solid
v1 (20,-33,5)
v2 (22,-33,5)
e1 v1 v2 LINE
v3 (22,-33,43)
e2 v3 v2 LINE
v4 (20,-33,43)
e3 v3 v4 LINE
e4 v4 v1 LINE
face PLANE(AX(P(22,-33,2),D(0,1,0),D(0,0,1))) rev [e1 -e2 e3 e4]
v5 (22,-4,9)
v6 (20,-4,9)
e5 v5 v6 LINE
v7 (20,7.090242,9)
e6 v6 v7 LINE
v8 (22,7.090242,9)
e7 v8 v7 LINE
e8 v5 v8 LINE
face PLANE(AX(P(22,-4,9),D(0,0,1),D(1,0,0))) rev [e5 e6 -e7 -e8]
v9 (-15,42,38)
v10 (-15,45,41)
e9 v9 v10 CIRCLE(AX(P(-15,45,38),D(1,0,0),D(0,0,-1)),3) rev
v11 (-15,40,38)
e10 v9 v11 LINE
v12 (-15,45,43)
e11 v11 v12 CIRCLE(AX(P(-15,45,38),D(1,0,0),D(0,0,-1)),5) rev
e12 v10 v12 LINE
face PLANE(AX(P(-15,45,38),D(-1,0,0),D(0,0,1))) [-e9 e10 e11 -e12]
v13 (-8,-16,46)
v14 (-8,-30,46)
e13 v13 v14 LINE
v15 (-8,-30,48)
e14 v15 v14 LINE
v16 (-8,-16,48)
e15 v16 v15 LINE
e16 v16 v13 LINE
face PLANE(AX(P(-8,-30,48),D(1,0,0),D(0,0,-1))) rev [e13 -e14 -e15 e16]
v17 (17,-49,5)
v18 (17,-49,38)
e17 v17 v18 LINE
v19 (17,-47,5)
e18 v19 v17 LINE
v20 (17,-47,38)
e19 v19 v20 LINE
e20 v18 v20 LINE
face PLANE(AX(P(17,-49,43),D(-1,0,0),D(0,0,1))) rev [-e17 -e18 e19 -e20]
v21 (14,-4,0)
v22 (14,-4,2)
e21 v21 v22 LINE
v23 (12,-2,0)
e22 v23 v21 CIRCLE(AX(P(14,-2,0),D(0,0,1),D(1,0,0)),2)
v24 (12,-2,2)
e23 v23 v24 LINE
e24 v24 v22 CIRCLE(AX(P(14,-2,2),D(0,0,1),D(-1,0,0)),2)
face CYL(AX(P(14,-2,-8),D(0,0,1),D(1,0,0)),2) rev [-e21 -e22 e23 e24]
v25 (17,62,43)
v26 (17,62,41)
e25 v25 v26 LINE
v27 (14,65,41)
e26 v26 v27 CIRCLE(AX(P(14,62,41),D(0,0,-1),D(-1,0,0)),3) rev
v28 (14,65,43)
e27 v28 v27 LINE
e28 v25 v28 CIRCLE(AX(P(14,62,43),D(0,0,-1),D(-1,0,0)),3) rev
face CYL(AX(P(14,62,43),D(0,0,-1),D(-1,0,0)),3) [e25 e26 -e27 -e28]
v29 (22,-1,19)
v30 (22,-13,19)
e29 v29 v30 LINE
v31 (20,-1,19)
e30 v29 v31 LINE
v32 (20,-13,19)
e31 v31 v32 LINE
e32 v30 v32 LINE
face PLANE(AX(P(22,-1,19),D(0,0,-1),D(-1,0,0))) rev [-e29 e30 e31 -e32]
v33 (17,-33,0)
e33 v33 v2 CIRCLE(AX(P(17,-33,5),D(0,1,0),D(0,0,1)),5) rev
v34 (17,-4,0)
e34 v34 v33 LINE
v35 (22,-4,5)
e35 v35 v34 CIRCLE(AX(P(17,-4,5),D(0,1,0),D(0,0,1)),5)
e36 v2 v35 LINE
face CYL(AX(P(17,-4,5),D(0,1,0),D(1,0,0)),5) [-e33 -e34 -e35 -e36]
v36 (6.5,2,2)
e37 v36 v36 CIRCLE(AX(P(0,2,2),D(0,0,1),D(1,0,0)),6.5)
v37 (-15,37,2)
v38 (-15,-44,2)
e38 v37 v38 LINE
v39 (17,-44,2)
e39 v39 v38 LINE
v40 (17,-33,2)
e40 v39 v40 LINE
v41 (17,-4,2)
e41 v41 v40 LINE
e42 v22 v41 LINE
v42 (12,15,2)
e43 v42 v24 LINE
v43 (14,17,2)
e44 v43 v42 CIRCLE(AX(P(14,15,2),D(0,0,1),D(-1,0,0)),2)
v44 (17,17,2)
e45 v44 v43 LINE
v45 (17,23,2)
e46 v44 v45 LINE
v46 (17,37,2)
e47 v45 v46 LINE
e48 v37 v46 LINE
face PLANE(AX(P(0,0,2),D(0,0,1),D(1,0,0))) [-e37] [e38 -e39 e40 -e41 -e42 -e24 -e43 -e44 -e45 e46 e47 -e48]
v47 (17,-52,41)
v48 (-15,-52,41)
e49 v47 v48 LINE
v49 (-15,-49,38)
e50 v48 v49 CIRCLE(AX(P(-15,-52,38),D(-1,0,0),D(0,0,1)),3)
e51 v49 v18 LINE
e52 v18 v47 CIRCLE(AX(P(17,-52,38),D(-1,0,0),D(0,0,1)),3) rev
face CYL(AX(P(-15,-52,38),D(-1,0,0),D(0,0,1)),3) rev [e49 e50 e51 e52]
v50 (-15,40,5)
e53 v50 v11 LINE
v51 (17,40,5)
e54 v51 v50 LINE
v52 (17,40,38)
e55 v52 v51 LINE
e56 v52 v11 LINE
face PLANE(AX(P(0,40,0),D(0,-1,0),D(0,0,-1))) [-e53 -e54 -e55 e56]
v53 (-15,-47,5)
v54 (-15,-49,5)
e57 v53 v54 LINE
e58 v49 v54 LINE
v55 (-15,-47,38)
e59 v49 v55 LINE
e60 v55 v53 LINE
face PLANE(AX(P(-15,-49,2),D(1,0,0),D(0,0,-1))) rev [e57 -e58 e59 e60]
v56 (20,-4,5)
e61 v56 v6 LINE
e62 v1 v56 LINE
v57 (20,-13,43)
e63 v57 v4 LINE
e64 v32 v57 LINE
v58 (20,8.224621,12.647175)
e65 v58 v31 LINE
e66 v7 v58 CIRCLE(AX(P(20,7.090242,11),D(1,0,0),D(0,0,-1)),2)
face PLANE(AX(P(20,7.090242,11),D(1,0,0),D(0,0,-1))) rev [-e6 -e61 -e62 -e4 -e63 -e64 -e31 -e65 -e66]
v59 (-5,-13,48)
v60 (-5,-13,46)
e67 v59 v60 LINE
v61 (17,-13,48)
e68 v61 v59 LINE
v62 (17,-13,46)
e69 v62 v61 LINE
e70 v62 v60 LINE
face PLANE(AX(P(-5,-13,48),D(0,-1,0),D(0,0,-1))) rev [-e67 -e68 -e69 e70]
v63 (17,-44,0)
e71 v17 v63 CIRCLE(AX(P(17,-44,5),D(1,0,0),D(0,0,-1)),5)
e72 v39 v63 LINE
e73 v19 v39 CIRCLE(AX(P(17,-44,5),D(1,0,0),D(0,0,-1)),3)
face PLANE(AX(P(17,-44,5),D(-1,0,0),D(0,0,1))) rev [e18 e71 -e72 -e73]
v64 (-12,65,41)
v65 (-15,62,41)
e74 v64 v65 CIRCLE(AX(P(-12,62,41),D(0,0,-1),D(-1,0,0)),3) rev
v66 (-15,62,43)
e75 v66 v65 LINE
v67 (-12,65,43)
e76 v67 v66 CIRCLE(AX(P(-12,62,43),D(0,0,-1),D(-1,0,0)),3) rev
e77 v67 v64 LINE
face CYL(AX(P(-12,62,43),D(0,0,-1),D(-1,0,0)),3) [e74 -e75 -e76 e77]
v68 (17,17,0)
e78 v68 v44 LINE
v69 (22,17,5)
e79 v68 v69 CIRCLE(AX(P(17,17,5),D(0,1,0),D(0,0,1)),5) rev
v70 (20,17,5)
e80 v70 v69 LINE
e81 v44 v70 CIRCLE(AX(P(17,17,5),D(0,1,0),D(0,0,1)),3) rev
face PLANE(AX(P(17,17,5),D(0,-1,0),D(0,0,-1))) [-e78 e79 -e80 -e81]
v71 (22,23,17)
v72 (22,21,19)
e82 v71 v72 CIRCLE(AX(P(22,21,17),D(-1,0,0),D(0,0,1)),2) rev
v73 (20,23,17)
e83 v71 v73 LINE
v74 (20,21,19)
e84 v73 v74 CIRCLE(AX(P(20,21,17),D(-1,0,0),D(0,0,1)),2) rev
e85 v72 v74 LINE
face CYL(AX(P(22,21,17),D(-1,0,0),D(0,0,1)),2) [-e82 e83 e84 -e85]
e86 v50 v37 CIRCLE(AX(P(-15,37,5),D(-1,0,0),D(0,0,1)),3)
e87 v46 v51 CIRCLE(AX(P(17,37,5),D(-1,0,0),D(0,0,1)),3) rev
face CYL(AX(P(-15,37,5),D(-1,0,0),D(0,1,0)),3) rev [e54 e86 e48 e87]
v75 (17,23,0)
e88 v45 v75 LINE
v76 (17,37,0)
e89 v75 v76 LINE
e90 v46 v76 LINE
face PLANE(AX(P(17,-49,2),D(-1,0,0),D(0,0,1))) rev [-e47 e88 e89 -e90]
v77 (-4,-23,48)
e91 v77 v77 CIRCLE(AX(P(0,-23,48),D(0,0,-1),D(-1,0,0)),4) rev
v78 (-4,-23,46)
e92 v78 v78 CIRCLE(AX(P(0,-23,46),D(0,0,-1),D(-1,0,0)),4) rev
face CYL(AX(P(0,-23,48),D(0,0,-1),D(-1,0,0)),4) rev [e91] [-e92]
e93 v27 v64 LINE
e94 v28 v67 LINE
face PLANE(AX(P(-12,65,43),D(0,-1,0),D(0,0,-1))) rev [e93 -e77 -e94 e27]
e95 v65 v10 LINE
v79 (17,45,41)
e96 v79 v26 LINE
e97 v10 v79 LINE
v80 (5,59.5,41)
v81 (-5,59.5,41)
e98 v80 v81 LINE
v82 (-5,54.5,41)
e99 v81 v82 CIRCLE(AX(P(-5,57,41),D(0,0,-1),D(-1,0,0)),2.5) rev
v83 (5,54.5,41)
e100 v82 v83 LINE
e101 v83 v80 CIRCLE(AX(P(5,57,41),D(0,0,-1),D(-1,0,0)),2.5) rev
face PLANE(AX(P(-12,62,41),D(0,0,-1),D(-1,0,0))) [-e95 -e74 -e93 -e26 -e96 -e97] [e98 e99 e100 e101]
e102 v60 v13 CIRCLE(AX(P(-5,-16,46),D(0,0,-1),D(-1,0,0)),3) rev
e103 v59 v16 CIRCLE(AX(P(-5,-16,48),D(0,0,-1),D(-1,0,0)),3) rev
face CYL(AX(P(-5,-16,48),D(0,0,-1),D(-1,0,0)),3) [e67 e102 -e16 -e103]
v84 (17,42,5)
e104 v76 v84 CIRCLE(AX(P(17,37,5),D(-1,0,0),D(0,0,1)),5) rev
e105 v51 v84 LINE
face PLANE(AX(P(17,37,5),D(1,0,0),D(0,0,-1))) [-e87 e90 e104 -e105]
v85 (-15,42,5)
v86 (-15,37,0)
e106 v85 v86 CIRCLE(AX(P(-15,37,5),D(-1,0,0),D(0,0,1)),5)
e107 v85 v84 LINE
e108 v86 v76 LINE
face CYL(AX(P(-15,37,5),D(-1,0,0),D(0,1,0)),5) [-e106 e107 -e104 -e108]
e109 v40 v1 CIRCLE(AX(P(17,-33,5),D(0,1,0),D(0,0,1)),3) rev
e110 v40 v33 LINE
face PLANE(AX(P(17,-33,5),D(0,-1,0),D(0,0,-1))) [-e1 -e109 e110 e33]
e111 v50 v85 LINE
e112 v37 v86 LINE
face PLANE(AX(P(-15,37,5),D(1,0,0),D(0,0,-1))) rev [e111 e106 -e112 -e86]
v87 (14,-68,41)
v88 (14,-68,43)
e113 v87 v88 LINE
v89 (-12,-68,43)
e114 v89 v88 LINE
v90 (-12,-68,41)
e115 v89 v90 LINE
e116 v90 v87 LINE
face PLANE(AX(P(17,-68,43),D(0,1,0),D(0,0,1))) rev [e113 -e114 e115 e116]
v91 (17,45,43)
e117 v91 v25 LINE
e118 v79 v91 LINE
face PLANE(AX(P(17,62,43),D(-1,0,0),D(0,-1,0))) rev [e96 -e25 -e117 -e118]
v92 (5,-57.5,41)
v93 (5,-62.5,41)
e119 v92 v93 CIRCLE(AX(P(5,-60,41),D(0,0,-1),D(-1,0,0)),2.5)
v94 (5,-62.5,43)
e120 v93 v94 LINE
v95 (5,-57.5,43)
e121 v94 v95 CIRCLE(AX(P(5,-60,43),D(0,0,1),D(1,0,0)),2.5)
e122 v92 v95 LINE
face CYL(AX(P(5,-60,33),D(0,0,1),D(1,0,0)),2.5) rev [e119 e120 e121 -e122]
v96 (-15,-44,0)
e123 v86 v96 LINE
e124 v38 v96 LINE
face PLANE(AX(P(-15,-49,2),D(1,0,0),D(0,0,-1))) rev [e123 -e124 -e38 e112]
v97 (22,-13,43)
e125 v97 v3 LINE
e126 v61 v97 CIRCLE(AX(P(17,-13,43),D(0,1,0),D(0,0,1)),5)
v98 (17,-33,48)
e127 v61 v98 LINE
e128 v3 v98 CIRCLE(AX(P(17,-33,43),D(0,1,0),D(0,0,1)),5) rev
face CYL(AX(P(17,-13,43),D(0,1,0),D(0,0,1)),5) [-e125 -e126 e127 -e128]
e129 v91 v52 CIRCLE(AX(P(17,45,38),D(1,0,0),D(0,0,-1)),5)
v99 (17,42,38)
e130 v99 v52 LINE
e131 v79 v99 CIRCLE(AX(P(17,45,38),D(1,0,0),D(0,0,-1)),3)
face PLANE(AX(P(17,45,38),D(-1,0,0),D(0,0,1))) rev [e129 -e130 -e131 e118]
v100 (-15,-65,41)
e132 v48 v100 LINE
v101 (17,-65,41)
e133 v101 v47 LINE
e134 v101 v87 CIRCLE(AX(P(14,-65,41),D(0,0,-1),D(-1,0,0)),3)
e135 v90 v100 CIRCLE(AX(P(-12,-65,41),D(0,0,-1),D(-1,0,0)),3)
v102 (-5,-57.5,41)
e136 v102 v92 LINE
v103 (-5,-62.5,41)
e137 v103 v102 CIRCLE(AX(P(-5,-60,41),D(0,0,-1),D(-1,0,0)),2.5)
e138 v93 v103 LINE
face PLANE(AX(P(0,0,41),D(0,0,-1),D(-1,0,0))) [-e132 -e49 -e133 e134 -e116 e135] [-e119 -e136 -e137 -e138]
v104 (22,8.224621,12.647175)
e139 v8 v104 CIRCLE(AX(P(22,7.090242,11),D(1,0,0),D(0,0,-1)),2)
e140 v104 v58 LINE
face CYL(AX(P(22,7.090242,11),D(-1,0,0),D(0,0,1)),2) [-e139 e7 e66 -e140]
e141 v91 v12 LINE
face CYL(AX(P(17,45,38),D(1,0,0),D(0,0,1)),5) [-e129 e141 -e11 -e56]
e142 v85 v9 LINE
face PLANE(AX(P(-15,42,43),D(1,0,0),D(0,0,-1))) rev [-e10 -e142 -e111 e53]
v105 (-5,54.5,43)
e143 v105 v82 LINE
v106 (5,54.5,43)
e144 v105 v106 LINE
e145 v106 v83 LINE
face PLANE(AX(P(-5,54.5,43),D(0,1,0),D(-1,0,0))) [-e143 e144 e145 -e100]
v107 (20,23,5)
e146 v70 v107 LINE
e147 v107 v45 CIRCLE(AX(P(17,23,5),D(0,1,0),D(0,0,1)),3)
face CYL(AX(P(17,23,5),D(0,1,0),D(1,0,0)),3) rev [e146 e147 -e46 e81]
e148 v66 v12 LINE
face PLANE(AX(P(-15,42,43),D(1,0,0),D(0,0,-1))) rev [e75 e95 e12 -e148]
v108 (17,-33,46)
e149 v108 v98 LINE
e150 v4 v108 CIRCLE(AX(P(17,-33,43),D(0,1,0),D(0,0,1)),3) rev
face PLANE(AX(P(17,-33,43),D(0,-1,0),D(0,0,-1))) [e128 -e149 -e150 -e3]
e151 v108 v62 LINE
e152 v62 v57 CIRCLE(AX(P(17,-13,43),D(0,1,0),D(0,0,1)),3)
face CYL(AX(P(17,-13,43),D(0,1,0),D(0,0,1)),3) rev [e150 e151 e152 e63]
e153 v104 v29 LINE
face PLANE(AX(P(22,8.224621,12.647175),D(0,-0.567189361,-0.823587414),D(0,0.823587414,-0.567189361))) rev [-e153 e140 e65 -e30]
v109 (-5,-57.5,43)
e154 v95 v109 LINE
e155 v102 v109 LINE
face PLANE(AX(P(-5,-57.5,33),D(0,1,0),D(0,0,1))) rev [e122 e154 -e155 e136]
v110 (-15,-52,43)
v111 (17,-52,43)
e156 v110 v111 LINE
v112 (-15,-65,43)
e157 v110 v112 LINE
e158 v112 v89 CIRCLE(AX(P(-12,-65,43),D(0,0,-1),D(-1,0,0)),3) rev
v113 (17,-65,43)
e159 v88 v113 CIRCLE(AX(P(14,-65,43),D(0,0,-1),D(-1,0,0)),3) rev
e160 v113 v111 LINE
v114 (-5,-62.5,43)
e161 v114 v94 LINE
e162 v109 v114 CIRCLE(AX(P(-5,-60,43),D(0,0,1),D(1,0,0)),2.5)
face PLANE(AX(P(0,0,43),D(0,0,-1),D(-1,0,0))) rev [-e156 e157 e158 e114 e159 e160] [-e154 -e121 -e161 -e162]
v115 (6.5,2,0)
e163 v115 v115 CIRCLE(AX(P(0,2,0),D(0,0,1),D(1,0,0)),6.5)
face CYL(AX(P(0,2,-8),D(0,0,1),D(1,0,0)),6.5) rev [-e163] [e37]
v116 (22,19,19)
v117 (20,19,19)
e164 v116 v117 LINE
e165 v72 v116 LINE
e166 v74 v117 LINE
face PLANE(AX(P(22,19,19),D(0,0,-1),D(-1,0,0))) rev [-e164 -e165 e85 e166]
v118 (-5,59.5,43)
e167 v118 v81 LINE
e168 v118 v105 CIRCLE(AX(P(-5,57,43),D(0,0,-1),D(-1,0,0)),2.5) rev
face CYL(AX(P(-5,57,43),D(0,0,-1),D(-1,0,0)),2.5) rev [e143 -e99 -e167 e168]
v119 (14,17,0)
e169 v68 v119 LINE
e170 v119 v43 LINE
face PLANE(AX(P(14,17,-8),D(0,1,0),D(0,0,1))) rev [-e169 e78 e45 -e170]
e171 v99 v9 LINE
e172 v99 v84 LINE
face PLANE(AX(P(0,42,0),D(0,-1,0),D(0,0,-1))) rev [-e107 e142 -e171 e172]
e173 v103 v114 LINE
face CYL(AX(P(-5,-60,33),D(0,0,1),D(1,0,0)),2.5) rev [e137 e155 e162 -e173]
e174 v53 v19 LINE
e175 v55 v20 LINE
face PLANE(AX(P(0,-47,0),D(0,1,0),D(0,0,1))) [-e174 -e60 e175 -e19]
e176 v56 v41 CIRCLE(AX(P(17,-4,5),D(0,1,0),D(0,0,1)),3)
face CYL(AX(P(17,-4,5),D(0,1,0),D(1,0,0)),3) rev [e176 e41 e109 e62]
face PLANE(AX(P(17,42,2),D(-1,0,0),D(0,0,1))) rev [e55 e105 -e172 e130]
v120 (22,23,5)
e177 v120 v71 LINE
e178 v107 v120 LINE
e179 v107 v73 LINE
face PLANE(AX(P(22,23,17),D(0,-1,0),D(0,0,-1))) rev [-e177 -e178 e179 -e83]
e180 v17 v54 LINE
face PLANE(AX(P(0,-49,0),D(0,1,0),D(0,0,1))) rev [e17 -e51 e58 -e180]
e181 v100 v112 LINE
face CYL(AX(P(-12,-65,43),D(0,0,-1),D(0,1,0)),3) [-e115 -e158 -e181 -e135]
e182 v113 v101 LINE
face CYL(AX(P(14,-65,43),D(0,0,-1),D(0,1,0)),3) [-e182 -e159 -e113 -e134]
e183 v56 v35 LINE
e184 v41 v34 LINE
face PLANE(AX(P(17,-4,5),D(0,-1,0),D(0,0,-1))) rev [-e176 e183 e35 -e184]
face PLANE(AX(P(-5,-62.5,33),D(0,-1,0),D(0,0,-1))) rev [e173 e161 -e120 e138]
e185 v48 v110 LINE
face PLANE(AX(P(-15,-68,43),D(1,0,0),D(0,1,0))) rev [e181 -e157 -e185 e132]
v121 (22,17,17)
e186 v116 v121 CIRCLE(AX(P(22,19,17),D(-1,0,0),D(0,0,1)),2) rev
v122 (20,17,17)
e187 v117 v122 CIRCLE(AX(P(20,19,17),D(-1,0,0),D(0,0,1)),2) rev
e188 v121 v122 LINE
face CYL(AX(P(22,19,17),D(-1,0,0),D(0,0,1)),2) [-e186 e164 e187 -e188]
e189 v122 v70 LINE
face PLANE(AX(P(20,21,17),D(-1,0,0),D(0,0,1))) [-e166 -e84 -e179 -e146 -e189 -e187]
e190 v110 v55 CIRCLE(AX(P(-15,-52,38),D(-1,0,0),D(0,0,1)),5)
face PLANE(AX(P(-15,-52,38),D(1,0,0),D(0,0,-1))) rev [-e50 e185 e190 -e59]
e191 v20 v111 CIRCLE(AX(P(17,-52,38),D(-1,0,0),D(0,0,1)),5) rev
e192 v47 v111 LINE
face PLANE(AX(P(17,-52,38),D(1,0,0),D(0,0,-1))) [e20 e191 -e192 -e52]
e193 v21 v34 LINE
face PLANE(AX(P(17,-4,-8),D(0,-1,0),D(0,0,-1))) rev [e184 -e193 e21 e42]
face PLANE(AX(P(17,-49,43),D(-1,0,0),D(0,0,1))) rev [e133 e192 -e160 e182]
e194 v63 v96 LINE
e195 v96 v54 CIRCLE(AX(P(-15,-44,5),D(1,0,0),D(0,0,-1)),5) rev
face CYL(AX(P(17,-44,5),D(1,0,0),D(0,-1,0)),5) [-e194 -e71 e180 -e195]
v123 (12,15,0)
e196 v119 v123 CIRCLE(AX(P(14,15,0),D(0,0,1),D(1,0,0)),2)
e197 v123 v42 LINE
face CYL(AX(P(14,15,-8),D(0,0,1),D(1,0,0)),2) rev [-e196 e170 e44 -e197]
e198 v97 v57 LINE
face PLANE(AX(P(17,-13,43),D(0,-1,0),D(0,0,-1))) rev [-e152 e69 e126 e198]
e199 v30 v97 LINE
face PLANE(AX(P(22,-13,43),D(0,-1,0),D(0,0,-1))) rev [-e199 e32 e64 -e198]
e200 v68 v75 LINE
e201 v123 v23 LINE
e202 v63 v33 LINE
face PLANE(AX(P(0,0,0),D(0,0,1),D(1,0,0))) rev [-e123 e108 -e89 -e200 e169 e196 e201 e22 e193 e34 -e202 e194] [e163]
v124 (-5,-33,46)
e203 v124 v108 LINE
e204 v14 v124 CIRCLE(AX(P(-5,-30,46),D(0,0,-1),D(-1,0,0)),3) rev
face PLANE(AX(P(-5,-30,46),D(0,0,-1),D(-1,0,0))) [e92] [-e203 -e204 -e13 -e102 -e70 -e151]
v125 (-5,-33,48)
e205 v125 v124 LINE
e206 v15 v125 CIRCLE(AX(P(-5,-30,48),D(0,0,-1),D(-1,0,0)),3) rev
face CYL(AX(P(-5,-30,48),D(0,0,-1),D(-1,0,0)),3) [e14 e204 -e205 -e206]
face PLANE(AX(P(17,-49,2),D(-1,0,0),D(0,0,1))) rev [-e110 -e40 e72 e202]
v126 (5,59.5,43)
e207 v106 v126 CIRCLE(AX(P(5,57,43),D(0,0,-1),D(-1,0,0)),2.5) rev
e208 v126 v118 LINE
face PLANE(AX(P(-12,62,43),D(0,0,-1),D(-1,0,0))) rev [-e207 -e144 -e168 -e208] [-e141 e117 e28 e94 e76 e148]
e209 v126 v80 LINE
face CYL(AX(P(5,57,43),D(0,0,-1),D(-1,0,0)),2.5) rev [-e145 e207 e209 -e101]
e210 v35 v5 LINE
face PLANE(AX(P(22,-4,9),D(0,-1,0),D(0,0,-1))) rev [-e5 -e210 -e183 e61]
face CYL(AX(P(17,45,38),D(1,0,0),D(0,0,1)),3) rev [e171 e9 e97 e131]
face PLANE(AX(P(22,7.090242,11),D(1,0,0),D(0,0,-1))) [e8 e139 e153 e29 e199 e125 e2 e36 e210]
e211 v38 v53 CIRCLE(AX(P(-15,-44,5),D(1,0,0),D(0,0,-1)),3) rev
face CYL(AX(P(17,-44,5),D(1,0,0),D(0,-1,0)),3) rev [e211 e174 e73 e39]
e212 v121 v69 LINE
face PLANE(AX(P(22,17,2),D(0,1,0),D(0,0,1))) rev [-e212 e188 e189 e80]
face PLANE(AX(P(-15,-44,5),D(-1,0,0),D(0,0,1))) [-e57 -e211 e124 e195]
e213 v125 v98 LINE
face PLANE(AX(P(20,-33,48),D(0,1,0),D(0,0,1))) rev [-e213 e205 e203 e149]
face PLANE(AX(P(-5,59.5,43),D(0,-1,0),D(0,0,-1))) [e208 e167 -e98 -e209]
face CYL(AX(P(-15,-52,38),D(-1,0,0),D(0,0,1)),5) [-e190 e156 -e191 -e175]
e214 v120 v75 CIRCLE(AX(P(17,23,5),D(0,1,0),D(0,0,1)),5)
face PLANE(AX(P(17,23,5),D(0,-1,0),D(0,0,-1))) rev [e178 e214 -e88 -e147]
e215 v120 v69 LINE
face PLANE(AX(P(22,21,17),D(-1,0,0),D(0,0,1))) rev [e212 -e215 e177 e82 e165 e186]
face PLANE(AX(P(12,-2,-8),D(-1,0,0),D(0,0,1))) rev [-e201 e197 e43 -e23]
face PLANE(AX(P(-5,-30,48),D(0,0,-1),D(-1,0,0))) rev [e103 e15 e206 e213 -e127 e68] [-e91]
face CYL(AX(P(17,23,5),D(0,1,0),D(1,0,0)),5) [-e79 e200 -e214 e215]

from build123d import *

# Parameters (mm, degrees)
SKETCH1_W                    = 91
SKETCH1_H                    = 32
BASE_FLANGE1_DEPTH           = 2
EDGE_FLANGE1_STRIP_W         = 14
EDGE_FLANGE1_STRIP_H         = 2
EDGE_FLANGE1_STRIP_CUT_DEPTH = 32
EDGE_FLANGE1_DEPTH           = 32
EDGE_FLANGE2_STRIP_W         = 14
EDGE_FLANGE2_STRIP_H         = 2
EDGE_FLANGE2_STRIP_CUT_DEPTH = 32
EDGE_FLANGE2_DEPTH           = 32
FILLET1_R                    = 3
EDGE_FLANGE3_DEPTH           = 29
EDGE_FLANGE3_START           = 2
EDGE_FLANGE3_FLAT_DEPTH      = 2
EDGE_FLANGE4_DEPTH           = 20
EDGE_FLANGE4_START           = 2
EDGE_FLANGE4_PROFILE_R       = 4
EDGE_FLANGE4_FLAT_DEPTH      = 2
SKETCH18_R                   = 6.5
CUT_EXTRUDE1_DEPTH           = 10
EDGE_FLANGE5_DEPTH           = 6
EDGE_FLANGE5_START           = 2
EDGE_FLANGE5_FLAT_DEPTH      = 2
EDGE_FLANGE6_STRIP_W         = 14
EDGE_FLANGE6_STRIP_H         = 2
EDGE_FLANGE6_STRIP_CUT_DEPTH = 32
EDGE_FLANGE6_DEPTH           = 32
EDGE_FLANGE7_STRIP_W         = 14
EDGE_FLANGE7_STRIP_H         = 2
EDGE_FLANGE7_STRIP_CUT_DEPTH = 32
EDGE_FLANGE7_DEPTH           = 32
EDGE_FLANGE7_FLAT_DEPTH      = 2
CUT_EXTRUDE2_DEPTH           = 10


# Sheet-metal steps are written as plain solids
with BuildPart() as part:
    # Sketch1 → Base-Flange1 (new body)
    with BuildSketch(Plane(origin=(0, 0, 0), x_dir=(0, 1, 0), z_dir=(0, 0, 1))):
        with Locations((-3.5, -1)):
            Rectangle(SKETCH1_W, SKETCH1_H)
    extrude(amount=BASE_FLANGE1_DEPTH)

    # Edge-Flange1 strip (across the edge) → Edge-Flange1 strip cut (cut)
    with BuildSketch(Plane(origin=(-15, -49, 2), x_dir=(0, 1, 0), z_dir=(1, 0, 0))):
        with Locations((-2, -1)):
            Rectangle(EDGE_FLANGE1_STRIP_W, EDGE_FLANGE1_STRIP_H)
    extrude(amount=EDGE_FLANGE1_STRIP_CUT_DEPTH, mode=Mode.SUBTRACT)

    # Edge-Flange1 section (across the edge) → Edge-Flange1 (add)
    with BuildSketch(Plane(origin=(-15, -49, 2), x_dir=(0, 1, 0), z_dir=(1, 0, 0))):
        with BuildLine():
            Line((0, 3), (0, 41))
            Line((0, 41), (2, 41))
            Line((2, 41), (2, 3))
            ThreePointArc((2, 3), (2.878679656, 0.878679656), (5, 0))
            Line((5, 0), (5, -2))
            ThreePointArc((5, -2), (1.464466094, -0.535533906), (0, 3))
        make_face()
    extrude(amount=EDGE_FLANGE1_DEPTH)

    # Edge-Flange2 strip (across the edge) → Edge-Flange2 strip cut (cut)
    with BuildSketch(Plane(origin=(17, -49, 43), x_dir=(0, 0, -1), z_dir=(-1, 0, 0))):
        with Locations((-2, -1)):
            Rectangle(EDGE_FLANGE2_STRIP_W, EDGE_FLANGE2_STRIP_H)
    extrude(amount=EDGE_FLANGE2_STRIP_CUT_DEPTH, mode=Mode.SUBTRACT)

    # Edge-Flange2 section (across the edge) → Edge-Flange2 (add)
    with BuildSketch(Plane(origin=(17, -49, 43), x_dir=(0, 0, -1), z_dir=(-1, 0, 0))):
        with BuildLine():
            Line((0, 3), (0, 19))
            Line((0, 19), (2, 19))
            Line((2, 19), (2, 3))
            ThreePointArc((2, 3), (2.878679656, 0.878679656), (5, 0))
            Line((5, 0), (5, -2))
            ThreePointArc((5, -2), (1.464466094, -0.535533906), (0, 3))
        make_face()
    extrude(amount=EDGE_FLANGE2_DEPTH)

    # Fillet1
    fillet1_edges = [part.edges().sort_by_distance(p)[0] for p in [
        (17, -68, 42),
        (-15, -68, 42),
    ]]
    fillet(fillet1_edges, radius=FILLET1_R)

    # Edge-Flange3 bend section (across the edge) → Edge-Flange3 (add)
    with BuildSketch(Plane(origin=(20, -33, 2), x_dir=(-1, 0, 0), z_dir=(0, 1, 0))):
        with BuildLine():
            Line((-2, 3), (0, 3))
            ThreePointArc((0, 3), (0.878679656, 0.878679656), (3, 0))
            Line((3, 0), (3, -2))
            ThreePointArc((3, -2), (-0.535533906, -0.535533906), (-2, 3))
        make_face()
    extrude(amount=EDGE_FLANGE3_DEPTH)

    # Edge-Flange3 profile (on flange) → Edge-Flange3 flat (add)
    with BuildSketch(Plane(origin=(20, 0, 2), x_dir=(0, 1, 0), z_dir=(1, 0, 0)).offset(EDGE_FLANGE3_START)):
        with BuildLine():
            Line((-33, 41), (-33, 3))
            Line((-33, 3), (-4, 3))
            Line((-4, 3), (-4, 7))
            Line((-4, 7), (7.090242207, 7))
            ThreePointArc((7.090242207, 7), (9, 8.406009114), (8.22462093, 10.647174828))
            Line((8.22462093, 10.647174828), (-1, 17))
            Line((-1, 17), (-13, 17))
            Line((-13, 17), (-13, 41))
            Line((-13, 41), (-33, 41))
        make_face()
    extrude(amount=-EDGE_FLANGE3_FLAT_DEPTH)

    # Edge-Flange4 bend section (across the edge) → Edge-Flange4 (add)
    with BuildSketch(Plane(origin=(20, -33, 46), x_dir=(0, 0, -1), z_dir=(0, 1, 0))):
        with BuildLine():
            Line((-2, 3), (0, 3))
            ThreePointArc((0, 3), (0.878679656, 0.878679656), (3, 0))
            Line((3, 0), (3, -2))
            ThreePointArc((3, -2), (-0.535533906, -0.535533906), (-2, 3))
        make_face()
    extrude(amount=EDGE_FLANGE4_DEPTH)

    # Edge-Flange4 profile (on flange) → Edge-Flange4 flat (add)
    with BuildSketch(Plane(origin=(20, 0, 46), x_dir=(0, 1, 0), z_dir=(0, 0, 1)).offset(EDGE_FLANGE4_START)):
        with BuildLine():
            ThreePointArc((-13, 25), (-13.878679656, 27.121320344), (-16, 28))
            Line((-16, 28), (-30, 28))
            ThreePointArc((-30, 28), (-32.121320344, 27.121320344), (-33, 25))
            Line((-33, 25), (-33, 3))
            Line((-33, 3), (-13, 3))
            Line((-13, 3), (-13, 25))
        make_face()
        with Locations((-23, 20)):
            Circle(EDGE_FLANGE4_PROFILE_R, mode=Mode.SUBTRACT)
    extrude(amount=-EDGE_FLANGE4_FLAT_DEPTH)

    # Sketch18 → Cut-Extrude1 (cut)
    with BuildSketch(Plane.XY.offset(2)):
        with Locations((0, 2)):
            Circle(SKETCH18_R)
        with BuildLine():
            Line((17, -4), (14, -4))
            ThreePointArc((14, -4), (12.585786438, -3.414213562), (12, -2))
            Line((12, -2), (12, 15))
            ThreePointArc((12, 15), (12.585786438, 16.414213562), (14, 17))
            Line((14, 17), (17, 17))
            Line((17, 17), (17, -4))
        make_face()
    extrude(amount=-CUT_EXTRUDE1_DEPTH, mode=Mode.SUBTRACT)

    # Edge-Flange5 bend section (across the edge) → Edge-Flange5 (add)
    with BuildSketch(Plane(origin=(20, 17, 2), x_dir=(-1, 0, 0), z_dir=(0, 1, 0))):
        with BuildLine():
            Line((-2, 3), (0, 3))
            ThreePointArc((0, 3), (0.878679656, 0.878679656), (3, 0))
            Line((3, 0), (3, -2))
            ThreePointArc((3, -2), (-0.535533906, -0.535533906), (-2, 3))
        make_face()
    extrude(amount=EDGE_FLANGE5_DEPTH)

    # Edge-Flange5 profile (on flange) → Edge-Flange5 flat (add)
    with BuildSketch(Plane(origin=(20, 0, 2), x_dir=(0, 1, 0), z_dir=(1, 0, 0)).offset(EDGE_FLANGE5_START)):
        with BuildLine():
            Line((17, 3), (23, 3))
            Line((23, 3), (23, 15))
            ThreePointArc((23, 15), (22.414213562, 16.414213562), (21, 17))
            Line((21, 17), (19, 17))
            ThreePointArc((19, 17), (17.585786438, 16.414213562), (17, 15))
            Line((17, 15), (17, 3))
        make_face()
    extrude(amount=-EDGE_FLANGE5_FLAT_DEPTH)

    # Edge-Flange6 strip (across the edge) → Edge-Flange6 strip cut (cut)
    with BuildSketch(Plane(origin=(17, 42, 2), x_dir=(0, -1, 0), z_dir=(-1, 0, 0))):
        with Locations((-2, -1)):
            Rectangle(EDGE_FLANGE6_STRIP_W, EDGE_FLANGE6_STRIP_H)
    extrude(amount=EDGE_FLANGE6_STRIP_CUT_DEPTH, mode=Mode.SUBTRACT)

    # Edge-Flange6 section (across the edge) → Edge-Flange6 (add)
    with BuildSketch(Plane(origin=(17, 42, 2), x_dir=(0, -1, 0), z_dir=(-1, 0, 0))):
        with BuildLine():
            Line((0, 3), (0, 41))
            Line((0, 41), (2, 41))
            Line((2, 41), (2, 3))
            ThreePointArc((2, 3), (2.878679656, 0.878679656), (5, 0))
            Line((5, 0), (5, -2))
            ThreePointArc((5, -2), (1.464466094, -0.535533906), (0, 3))
        make_face()
    extrude(amount=EDGE_FLANGE6_DEPTH)

    # Edge-Flange7 strip (across the edge) → Edge-Flange7 strip cut (cut)
    with BuildSketch(Plane(origin=(-15, 42, 43), x_dir=(0, 0, -1), z_dir=(1, 0, 0))):
        with Locations((-2, -1)):
            Rectangle(EDGE_FLANGE7_STRIP_W, EDGE_FLANGE7_STRIP_H)
    extrude(amount=EDGE_FLANGE7_STRIP_CUT_DEPTH, mode=Mode.SUBTRACT)

    # Edge-Flange7 bend section (across the edge) → Edge-Flange7 (add)
    with BuildSketch(Plane(origin=(-15, 42, 43), x_dir=(0, 0, -1), z_dir=(1, 0, 0))):
        with BuildLine():
            Line((0, 3), (2, 3))
            ThreePointArc((2, 3), (2.878679656, 0.878679656), (5, 0))
            Line((5, 0), (5, -2))
            ThreePointArc((5, -2), (1.464466094, -0.535533906), (0, 3))
        make_face()
    extrude(amount=EDGE_FLANGE7_DEPTH)

    # Edge-Flange7 profile (on flange) → Edge-Flange7 flat (add)
    with BuildSketch(Plane(origin=(0, 42, 43), x_dir=(1, 0, 0), z_dir=(0, 0, 1))):
        with BuildLine():
            ThreePointArc((-12, 23), (-14.121320344, 22.121320344), (-15, 20))
            Line((-15, 20), (-15, 3))
            Line((-15, 3), (17, 3))
            Line((17, 3), (17, 20))
            ThreePointArc((17, 20), (16.121320344, 22.121320344), (14, 23))
            Line((14, 23), (-12, 23))
        make_face()
        with BuildLine():
            Line((-5, 17.5), (5, 17.5))
            ThreePointArc((5, 17.5), (7.5, 15), (5, 12.5))
            Line((5, 12.5), (-5, 12.5))
            ThreePointArc((-5, 12.5), (-7.5, 15), (-5, 17.5))
        make_face(mode=Mode.SUBTRACT)
    extrude(amount=-EDGE_FLANGE7_FLAT_DEPTH)

    # Sketch28 → Cut-Extrude2 (cut)
    with BuildSketch(Plane.XY.offset(43)):
        with BuildLine():
            Line((-5, -57.5), (5, -57.5))
            ThreePointArc((5, -57.5), (7.5, -60), (5, -62.5))
            Line((5, -62.5), (-5, -62.5))
            ThreePointArc((-5, -62.5), (-7.5, -60), (-5, -57.5))
        make_face()
    extrude(amount=-CUT_EXTRUDE2_DEPTH, mode=Mode.SUBTRACT)


solid = part.part
